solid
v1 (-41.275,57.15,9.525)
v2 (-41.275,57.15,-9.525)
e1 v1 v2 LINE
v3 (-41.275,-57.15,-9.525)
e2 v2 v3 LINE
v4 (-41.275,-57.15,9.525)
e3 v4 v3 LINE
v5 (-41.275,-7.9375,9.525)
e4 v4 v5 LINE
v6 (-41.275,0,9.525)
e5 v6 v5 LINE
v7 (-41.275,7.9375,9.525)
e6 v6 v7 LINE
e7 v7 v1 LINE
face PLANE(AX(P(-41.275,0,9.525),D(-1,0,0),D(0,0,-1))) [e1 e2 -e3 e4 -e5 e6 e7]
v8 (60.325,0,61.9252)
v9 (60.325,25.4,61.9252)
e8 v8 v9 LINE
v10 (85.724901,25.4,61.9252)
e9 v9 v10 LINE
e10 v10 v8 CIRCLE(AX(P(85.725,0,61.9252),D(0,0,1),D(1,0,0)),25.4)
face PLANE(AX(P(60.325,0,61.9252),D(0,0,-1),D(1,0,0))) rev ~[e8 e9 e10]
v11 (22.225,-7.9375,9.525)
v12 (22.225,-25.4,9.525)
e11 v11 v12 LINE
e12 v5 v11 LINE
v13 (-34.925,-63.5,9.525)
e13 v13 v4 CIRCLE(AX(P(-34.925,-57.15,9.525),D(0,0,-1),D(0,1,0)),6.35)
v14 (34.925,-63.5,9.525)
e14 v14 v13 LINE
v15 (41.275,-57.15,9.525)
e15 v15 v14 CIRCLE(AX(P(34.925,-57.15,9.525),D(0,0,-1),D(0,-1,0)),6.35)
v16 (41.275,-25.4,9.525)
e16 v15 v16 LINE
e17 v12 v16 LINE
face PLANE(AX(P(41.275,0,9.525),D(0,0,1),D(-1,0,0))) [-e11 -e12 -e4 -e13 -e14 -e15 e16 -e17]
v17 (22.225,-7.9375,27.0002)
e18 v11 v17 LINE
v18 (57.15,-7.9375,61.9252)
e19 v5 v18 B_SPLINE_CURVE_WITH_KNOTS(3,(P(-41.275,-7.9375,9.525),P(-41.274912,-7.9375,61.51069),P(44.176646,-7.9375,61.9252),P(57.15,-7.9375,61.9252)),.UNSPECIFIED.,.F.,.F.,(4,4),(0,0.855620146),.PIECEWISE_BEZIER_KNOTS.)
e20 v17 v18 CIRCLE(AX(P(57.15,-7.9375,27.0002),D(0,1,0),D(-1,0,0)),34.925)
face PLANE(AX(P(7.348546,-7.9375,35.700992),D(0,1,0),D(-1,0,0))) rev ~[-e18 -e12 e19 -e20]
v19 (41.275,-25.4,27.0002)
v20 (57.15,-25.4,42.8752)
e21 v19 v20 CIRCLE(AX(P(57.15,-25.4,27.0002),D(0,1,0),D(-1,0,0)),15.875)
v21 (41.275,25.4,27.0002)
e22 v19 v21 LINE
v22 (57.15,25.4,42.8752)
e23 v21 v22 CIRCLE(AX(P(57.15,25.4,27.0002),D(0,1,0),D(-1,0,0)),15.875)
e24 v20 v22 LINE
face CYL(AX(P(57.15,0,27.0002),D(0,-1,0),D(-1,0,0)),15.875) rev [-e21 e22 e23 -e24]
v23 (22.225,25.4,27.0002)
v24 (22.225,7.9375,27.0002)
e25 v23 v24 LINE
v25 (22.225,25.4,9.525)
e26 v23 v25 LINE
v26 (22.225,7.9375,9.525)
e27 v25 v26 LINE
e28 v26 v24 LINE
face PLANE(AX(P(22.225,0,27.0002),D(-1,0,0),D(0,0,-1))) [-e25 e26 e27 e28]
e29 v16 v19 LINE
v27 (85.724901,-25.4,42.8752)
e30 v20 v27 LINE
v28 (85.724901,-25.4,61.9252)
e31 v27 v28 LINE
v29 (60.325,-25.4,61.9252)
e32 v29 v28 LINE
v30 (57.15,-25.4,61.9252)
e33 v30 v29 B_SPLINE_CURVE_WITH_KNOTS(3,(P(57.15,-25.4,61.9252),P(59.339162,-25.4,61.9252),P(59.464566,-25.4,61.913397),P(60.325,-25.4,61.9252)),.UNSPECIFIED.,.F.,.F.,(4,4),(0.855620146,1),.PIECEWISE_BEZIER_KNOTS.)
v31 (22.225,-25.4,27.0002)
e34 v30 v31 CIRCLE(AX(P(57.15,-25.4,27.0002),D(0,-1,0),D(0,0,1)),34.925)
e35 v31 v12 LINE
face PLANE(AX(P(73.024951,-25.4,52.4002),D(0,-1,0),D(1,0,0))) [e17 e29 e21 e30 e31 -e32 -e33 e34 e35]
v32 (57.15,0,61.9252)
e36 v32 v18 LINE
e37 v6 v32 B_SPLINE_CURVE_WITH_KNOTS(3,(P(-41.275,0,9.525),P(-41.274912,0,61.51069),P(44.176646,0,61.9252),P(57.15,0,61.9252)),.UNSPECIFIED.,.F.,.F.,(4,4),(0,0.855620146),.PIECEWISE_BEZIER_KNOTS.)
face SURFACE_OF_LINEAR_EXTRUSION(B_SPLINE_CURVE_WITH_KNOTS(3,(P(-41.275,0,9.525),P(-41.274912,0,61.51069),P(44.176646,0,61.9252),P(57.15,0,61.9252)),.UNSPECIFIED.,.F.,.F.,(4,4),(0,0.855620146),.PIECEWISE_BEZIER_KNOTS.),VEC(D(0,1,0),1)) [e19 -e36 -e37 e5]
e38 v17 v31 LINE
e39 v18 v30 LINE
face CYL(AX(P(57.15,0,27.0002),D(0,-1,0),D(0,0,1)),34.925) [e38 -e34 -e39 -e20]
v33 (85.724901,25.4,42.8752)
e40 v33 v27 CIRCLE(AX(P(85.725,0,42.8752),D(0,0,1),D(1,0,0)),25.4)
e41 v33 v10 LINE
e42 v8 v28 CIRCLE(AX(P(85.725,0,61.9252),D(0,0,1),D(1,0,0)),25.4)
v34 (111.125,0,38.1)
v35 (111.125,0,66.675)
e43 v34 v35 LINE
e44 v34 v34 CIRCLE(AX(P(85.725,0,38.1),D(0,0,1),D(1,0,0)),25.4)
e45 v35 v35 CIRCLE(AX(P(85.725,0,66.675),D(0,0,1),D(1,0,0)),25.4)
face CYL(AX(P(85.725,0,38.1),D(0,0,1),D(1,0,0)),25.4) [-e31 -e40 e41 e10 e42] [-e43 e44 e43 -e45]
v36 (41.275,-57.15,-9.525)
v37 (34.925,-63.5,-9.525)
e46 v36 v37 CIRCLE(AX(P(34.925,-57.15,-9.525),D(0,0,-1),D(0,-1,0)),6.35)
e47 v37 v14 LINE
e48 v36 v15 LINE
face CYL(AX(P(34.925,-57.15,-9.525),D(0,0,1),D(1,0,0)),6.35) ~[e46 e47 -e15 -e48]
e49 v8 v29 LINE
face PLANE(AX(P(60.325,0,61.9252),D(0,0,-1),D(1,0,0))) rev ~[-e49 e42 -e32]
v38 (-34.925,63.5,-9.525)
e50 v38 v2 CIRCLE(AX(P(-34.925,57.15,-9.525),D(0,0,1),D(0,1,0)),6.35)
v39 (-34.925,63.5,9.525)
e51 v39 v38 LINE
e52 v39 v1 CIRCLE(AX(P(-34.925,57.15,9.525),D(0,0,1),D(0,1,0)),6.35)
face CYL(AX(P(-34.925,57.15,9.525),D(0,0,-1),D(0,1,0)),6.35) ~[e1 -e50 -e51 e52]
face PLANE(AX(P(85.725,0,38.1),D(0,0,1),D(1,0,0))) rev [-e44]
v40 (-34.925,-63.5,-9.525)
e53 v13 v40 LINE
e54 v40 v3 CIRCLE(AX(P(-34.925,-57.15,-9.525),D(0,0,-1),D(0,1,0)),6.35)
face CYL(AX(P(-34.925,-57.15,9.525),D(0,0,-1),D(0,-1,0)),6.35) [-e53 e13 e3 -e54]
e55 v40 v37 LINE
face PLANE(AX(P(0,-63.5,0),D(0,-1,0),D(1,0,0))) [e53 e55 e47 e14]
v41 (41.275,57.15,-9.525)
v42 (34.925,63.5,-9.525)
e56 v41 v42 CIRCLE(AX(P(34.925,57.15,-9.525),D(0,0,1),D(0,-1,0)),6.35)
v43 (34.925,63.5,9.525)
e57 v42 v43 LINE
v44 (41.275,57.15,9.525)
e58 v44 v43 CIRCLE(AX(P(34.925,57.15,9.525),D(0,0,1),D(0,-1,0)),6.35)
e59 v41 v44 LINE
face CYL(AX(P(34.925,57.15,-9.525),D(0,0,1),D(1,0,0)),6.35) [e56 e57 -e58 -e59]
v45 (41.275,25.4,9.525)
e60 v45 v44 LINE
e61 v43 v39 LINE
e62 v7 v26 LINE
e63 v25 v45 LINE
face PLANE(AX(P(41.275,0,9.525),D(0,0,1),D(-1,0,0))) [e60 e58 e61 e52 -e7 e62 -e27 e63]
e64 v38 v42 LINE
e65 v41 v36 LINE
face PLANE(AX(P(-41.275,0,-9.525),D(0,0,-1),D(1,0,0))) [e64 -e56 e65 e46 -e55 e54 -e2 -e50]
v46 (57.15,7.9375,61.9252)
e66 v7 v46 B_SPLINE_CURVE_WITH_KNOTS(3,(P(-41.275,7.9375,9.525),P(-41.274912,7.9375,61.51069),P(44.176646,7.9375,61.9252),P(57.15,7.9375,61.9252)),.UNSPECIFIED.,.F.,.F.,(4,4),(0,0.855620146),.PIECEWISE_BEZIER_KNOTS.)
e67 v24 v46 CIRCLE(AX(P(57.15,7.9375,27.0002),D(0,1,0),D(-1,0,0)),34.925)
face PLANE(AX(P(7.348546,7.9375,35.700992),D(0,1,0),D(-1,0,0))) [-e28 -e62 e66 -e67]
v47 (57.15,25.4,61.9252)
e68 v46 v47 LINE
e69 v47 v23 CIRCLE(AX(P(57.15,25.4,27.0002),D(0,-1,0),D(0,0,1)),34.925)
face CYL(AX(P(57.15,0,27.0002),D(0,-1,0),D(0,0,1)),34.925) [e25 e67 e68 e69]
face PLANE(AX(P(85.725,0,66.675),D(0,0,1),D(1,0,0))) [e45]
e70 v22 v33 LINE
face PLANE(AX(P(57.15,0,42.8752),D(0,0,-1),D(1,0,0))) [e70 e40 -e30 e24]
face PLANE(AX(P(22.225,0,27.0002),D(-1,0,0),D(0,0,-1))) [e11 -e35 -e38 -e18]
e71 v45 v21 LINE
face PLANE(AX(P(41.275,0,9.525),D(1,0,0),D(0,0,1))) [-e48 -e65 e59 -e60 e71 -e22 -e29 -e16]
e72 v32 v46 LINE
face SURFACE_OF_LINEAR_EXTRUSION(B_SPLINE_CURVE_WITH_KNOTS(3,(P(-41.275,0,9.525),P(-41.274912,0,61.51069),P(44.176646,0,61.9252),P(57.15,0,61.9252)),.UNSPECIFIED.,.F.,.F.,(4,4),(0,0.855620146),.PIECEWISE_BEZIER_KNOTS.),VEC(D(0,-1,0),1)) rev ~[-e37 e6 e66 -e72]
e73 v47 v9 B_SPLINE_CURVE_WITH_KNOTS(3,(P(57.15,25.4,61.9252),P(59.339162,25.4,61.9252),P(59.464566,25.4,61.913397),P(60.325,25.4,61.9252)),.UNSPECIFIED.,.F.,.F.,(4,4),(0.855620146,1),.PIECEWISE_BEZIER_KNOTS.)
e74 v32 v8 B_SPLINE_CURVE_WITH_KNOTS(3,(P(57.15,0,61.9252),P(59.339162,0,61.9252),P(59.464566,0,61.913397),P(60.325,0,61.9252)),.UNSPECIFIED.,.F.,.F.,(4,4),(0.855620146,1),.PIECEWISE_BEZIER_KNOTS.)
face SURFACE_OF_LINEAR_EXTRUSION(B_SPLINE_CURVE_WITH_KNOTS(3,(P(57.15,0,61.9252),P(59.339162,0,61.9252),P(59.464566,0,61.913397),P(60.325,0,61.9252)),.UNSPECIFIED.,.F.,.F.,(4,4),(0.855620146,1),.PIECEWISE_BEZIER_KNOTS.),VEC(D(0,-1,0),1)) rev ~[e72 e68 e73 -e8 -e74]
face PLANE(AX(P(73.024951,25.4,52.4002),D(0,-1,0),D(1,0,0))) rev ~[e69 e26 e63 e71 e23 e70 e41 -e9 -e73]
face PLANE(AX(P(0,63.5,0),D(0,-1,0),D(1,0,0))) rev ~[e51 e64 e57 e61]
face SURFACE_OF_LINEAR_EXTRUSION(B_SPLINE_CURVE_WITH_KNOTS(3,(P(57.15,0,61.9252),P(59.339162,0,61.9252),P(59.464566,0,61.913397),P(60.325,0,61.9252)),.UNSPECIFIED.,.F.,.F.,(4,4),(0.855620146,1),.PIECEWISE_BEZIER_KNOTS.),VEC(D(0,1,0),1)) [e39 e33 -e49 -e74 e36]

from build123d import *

# Parameters (mm, degrees)
F1_DEPTH = 63.5
F0_W     = 25.3999010601
F0_H     = 19.05
F2_DEPTH = 25.4
F3_DEPTH = 7.9375
F5_R     = 6.35


# Not quite as in the source:
# - ends of sketch curves that miss each other by under 0.0002 mm in the source are joined


with BuildPart() as f1:
    # F0 (on Front) → F1 (new body, symmetric)
    with BuildSketch(Plane.XZ):
        Polygon((22.225, 9.525), (-41.275, 9.525), (-41.275, -9.525), (41.275, -9.525), (41.275, 9.525), align=None)
    extrude(amount=F1_DEPTH, both=True)

    # F0 (on Front) → F2 (join, symmetric)
    with BuildSketch(Plane.XZ):
        with Locations((73.0249505301, 52.4002)):
            Rectangle(F0_W, F0_H)
        with BuildLine():
            Line((22.225, 27.0002), (22.225, 9.5249091869))
            Line((22.225, 9.5249091869), (41.275, 9.525))
            Line((41.275, 9.525), (41.275, 27.0002))
            ThreePointArc((41.275, 27.0002), (45.9246798487, 38.2255201513), (57.15, 42.8752))
            Line((57.15, 42.8752), (60.325, 42.8752))
            Line((60.325, 42.8752), (60.325, 61.9252))
            add(Edge.make_bspline(
                [(57.15, 61.9252), (59.3391618347, 61.9252), (59.4645664096, 61.9133971632), (60.325, 61.9252)],
                knots=[0.8556201459, 0.8556201459, 0.8556201459, 0.8556201459, 1, 1, 1, 1], degree=3))
            ThreePointArc((57.15, 61.9252), (32.4542956671, 51.6959043329), (22.225, 27.0002))
        make_face()
    extrude(amount=F2_DEPTH, both=True)

    # F0 (on Front) → F3 (join, symmetric)
    with BuildSketch(Plane.XZ):
        with BuildLine():
            add(Edge.make_bspline(
                [(-41.275, 9.525), (-41.2749116122, 61.5106898116), (44.1766459292, 61.9252), (57.15, 61.9252)],
                knots=[0, 0, 0, 0, 0.8556201459, 0.8556201459, 0.8556201459, 0.8556201459], degree=3))
            Line((-41.275, 9.525), (22.225, 9.525))
            Line((22.225, 9.525), (22.225, 27.0002))
            ThreePointArc((22.225, 27.0002), (32.4542956671, 51.6959043329), (57.15, 61.9252))
        make_face()
    extrude(amount=F3_DEPTH, both=True)

    # F0 (on Front) → F4 (revolve)
    with BuildSketch(Plane.XZ):
        Polygon((85.725, 66.675), (85.725, 61.9252), (85.725, 42.8752), (85.725, 38.1), (111.125, 38.1), (111.125, 66.675), align=None)
    revolve(axis=Axis((85.725, 0, 52.3875), (0, 0, 1)))

    # F5
    f5_edges = [f1.edges().sort_by_distance(p)[0] for p in [
        (41.275, -63.5, 0),
        (-41.275, -63.5, 0),
        (41.275, 63.5, 0),
        (-41.275, 63.5, 0),
    ]]
    fillet(f5_edges, radius=F5_R)


solid = f1.part
